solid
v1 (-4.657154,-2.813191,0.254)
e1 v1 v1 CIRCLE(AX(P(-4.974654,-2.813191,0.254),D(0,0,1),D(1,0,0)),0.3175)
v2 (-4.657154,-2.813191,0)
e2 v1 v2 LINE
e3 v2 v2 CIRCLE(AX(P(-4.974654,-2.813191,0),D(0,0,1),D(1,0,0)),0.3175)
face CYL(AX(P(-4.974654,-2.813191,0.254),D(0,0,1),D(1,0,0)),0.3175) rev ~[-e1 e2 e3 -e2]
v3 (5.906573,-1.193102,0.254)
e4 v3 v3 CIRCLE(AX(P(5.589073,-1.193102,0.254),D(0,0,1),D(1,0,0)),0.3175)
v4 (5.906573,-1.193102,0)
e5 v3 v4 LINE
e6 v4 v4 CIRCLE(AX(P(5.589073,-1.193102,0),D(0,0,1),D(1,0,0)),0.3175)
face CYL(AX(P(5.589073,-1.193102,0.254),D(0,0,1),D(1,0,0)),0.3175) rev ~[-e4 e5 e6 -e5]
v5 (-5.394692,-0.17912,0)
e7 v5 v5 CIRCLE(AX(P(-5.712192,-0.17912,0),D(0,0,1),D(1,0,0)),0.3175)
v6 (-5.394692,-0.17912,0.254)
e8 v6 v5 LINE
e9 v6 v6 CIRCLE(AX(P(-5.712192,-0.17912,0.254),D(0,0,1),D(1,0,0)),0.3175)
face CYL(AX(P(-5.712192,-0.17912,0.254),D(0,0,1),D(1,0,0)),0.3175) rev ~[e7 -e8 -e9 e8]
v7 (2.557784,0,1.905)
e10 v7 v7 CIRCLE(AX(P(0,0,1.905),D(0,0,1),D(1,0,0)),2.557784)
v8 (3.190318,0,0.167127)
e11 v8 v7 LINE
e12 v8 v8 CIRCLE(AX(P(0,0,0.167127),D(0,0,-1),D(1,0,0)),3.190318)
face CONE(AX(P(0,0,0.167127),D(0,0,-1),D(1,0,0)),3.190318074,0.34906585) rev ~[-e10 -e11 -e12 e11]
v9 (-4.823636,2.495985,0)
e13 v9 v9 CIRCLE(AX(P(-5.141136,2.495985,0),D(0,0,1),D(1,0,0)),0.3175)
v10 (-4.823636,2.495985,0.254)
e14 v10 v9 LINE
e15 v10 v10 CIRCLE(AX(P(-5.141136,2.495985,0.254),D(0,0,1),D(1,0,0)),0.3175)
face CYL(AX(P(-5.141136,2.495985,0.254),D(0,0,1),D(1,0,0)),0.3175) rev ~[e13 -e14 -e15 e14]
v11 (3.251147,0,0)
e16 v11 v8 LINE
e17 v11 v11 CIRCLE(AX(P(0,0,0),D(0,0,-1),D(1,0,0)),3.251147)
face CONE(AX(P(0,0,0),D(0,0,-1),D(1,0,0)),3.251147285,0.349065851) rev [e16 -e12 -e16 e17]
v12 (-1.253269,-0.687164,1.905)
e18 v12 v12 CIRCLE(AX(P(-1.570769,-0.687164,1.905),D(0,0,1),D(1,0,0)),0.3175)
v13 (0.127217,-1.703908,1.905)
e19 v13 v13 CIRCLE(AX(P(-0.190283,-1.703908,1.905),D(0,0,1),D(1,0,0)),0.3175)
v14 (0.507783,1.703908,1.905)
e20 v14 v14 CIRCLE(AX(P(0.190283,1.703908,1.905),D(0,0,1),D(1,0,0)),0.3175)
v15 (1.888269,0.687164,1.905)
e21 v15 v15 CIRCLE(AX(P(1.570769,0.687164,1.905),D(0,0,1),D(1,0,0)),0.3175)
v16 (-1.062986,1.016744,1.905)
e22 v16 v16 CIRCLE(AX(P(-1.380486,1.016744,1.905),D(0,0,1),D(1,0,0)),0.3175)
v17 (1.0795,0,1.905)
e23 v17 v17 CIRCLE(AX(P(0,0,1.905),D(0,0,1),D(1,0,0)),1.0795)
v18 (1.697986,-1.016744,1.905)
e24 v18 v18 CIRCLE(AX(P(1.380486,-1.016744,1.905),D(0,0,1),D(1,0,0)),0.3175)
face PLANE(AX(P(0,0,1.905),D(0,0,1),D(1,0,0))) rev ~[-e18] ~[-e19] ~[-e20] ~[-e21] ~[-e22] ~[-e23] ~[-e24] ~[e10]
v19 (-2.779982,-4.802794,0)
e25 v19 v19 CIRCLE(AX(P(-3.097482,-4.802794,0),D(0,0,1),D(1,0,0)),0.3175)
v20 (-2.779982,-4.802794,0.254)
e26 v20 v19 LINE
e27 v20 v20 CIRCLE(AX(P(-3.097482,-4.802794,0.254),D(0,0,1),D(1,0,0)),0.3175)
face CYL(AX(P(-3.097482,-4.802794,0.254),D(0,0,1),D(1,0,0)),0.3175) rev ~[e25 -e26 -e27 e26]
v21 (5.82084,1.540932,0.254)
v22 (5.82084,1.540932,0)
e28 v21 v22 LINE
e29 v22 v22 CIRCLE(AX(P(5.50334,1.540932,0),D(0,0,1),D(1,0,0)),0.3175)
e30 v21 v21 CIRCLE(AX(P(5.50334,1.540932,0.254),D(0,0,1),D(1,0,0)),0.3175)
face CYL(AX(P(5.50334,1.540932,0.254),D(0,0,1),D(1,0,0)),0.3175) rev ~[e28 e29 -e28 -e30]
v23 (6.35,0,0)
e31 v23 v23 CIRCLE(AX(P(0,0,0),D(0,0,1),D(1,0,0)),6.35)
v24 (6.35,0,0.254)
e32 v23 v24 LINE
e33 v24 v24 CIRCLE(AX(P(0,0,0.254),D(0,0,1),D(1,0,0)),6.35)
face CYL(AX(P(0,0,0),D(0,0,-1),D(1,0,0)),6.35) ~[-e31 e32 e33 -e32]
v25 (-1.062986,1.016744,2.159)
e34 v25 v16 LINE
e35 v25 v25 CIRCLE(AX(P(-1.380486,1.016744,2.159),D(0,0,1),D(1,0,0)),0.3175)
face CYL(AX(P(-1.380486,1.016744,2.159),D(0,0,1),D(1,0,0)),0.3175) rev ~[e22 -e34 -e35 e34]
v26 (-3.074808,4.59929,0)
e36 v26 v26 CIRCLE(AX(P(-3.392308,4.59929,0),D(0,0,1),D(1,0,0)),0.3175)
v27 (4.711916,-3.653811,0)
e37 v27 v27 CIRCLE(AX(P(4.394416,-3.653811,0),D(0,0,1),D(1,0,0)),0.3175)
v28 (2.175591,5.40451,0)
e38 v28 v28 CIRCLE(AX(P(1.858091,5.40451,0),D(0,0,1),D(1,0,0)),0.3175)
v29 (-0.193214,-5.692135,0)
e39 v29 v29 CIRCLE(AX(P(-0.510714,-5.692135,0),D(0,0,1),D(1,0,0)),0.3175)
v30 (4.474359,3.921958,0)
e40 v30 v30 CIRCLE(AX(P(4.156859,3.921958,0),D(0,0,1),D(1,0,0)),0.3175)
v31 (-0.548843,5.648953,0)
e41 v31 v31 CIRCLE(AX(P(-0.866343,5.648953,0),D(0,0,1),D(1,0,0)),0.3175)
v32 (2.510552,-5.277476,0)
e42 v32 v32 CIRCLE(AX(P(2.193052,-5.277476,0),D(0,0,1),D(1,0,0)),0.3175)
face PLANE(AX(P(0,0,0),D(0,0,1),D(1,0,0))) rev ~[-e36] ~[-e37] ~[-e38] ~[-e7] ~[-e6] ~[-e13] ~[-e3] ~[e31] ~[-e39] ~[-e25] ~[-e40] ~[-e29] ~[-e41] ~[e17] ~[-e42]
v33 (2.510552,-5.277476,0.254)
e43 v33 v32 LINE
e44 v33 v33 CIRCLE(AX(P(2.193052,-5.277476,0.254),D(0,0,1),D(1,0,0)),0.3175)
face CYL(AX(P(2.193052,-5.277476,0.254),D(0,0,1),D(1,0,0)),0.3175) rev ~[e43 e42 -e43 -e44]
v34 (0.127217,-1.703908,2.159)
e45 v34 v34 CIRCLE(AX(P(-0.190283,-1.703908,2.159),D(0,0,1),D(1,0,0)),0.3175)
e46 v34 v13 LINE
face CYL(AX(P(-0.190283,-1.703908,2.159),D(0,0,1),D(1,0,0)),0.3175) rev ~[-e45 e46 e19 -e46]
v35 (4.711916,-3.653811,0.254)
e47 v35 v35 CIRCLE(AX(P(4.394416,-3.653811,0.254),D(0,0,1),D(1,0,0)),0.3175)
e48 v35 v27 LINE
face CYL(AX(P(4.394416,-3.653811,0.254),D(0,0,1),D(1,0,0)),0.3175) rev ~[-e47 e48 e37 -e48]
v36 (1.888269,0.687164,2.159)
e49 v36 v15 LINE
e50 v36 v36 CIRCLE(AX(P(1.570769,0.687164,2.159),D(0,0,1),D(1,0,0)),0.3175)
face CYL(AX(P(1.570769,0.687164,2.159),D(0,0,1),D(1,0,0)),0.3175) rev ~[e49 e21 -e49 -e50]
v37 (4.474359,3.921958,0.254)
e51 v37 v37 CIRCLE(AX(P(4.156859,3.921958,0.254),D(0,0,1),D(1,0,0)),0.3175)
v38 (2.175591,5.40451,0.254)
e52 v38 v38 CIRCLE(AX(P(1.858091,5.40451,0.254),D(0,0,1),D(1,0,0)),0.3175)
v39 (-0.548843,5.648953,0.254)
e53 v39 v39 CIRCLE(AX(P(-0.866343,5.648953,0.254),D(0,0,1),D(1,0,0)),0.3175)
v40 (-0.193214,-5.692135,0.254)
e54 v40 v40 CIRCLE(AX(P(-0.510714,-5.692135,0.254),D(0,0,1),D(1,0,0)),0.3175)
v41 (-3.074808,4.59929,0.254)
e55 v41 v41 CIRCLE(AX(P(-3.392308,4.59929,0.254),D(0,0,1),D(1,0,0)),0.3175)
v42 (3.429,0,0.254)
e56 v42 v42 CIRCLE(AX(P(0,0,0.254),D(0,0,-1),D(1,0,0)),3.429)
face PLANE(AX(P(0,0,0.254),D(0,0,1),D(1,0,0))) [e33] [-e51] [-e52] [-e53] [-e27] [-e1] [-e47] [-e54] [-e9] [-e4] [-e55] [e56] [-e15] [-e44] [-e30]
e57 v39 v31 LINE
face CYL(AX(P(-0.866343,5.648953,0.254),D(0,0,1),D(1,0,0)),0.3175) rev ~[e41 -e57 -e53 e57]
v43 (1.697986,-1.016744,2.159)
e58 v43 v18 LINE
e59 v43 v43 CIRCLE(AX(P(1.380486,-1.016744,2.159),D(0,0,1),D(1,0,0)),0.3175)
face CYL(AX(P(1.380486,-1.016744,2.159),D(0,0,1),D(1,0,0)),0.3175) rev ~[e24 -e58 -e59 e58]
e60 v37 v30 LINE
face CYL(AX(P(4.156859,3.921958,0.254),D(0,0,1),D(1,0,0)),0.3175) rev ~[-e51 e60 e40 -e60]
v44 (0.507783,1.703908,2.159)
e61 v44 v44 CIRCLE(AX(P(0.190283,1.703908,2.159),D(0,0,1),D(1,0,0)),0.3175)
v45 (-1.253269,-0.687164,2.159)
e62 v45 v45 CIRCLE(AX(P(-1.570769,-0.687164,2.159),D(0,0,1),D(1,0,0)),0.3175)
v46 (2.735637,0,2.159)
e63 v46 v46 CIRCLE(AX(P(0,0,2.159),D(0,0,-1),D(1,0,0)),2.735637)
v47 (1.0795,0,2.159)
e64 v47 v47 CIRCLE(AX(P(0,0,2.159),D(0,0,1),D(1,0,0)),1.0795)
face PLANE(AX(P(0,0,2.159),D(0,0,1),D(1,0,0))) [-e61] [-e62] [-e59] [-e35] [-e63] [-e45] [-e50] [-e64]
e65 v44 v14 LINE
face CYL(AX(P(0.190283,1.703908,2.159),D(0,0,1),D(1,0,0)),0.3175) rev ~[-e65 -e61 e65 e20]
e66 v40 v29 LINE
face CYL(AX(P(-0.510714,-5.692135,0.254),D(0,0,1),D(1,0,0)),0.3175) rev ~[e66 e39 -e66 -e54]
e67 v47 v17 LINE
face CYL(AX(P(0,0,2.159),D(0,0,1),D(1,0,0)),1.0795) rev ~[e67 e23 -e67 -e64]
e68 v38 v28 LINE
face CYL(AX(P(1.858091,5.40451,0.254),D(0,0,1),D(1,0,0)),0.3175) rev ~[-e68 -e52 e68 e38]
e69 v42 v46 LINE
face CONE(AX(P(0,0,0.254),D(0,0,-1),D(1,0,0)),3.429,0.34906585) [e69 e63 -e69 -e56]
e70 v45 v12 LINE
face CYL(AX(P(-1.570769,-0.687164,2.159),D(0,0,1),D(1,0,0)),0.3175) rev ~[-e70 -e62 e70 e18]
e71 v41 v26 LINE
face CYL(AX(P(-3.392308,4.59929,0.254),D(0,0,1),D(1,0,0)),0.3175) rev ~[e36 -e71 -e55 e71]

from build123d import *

# Parameters (mm, degrees)
F0_R      = 6.35
F1_DEPTH  = 0.254
F2_R      = 3.429
F3_DEPTH  = 1.905
F3_TAPER  = 20
F4_T      = 0.254
F5_R      = 1.0795
F6_DEPTH  = 25.4
F7_R      = 0.3175
F8_DEPTH  = 25.4
F9_R      = 0.3175
F10_DEPTH = 25.4


# Not quite as in the source:
# - a shell that OpenCascade refuses in one call is made with other operations: the cavity is built on its own and cut out


with BuildPart() as f1:
    # F0 (on Top) → F1 (new body)
    with BuildSketch(Plane.XY):
        Circle(F0_R)
    extrude(amount=F1_DEPTH)

    # F2 (on face) → F3 (join)
    with BuildSketch(Plane.XY.offset(0.254)):
        Circle(F2_R)
    extrude(amount=F3_DEPTH, taper=F3_TAPER)

    # F4: shell of thickness 0.254, made by hand


with BuildPart() as f4_core1:
    # F4_t2: copy of F1
    add(f1.part)

    # the walls: a layer under each face that stays
    f4_faces = [f4_core1.faces().sort_by_distance(p)[0] for p in [
        (-6.35, 0, 0.127),
        (-4.2333333333, -4.2333333333, 0.254),
        (-3.0823183519, 0, 1.2065),
        (0, 0, 2.159),
    ]]
    thicken(f4_faces, amount=-F4_T, mode=Mode.SUBTRACT)

    # F4_s3 → F4_t4 (revolve, cut)
    with BuildSketch(Plane.XZ):
        Polygon((3.4313868193, 0.2574087312), (3.429, 0), (3.2511472853, 0), (3.1903180743, 0.1671268836), align=None)
    revolve(axis=Axis((0, 0, 0.254), (0, 0, -1)), mode=Mode.SUBTRACT)


with BuildPart() as f1_1:
    add(f1.part)

    # what is left inside the walls is the cavity
    f4_cavity = [f4_core1.part.solids().sort_by_distance(p)[0] for p in [
        (-2.977087, 0, 0.745549),
    ]]
    add(f4_cavity, mode=Mode.SUBTRACT)

    # F5 (on face) → F6 (cut)
    with BuildSketch(Plane.XY.offset(2.159)):
        Circle(F5_R)
    extrude(amount=-F6_DEPTH, mode=Mode.SUBTRACT)

    # F7 (on face) → F8 (cut)
    with BuildSketch(Plane.XY.offset(2.159)):
        with Locations((-1.3804862777, 1.0167437666)):
            Circle(F7_R)
        with Locations((-1.5707690699, -0.6871643028)):
            Circle(F7_R)
        with Locations((-0.1902827922, -1.7039080694)):
            Circle(F7_R)
        with Locations((1.3804862777, -1.0167437666)):
            Circle(F7_R)
        with Locations((1.5707690699, 0.6871643028)):
            Circle(F7_R)
        with Locations((0.1902827922, 1.7039080694)):
            Circle(F7_R)
    extrude(amount=-F8_DEPTH, mode=Mode.SUBTRACT)

    # F9 (on face) → F10 (cut)
    with BuildSketch(Plane.XY.offset(0.254)):
        with Locations((-3.3923081987, 4.5992901719)):
            Circle(F9_R)
        with Locations((-5.1411364532, 2.4959849698)):
            Circle(F9_R)
        with Locations((-5.7121923037, -0.179120309)):
            Circle(F9_R)
        with Locations((-4.9746537368, -2.8131912837)):
            Circle(F9_R)
        with Locations((-3.0974819499, -4.8027940378)):
            Circle(F9_R)
        with Locations((-0.510714377, -5.6921345579)):
            Circle(F9_R)
        with Locations((2.193051705, -5.2774756484)):
            Circle(F9_R)
        with Locations((4.3944160704, -3.6538106683)):
            Circle(F9_R)
        with Locations((5.5890726726, -1.1931016973)):
            Circle(F9_R)
        with Locations((5.5033400811, 1.5409324941)):
            Circle(F9_R)
        with Locations((4.1568585995, 3.9219576214)):
            Circle(F9_R)
        with Locations((1.8580909083, 5.4045095223)):
            Circle(F9_R)
        with Locations((-0.8663430176, 5.6489534231)):
            Circle(F9_R)
    extrude(amount=-F10_DEPTH, mode=Mode.SUBTRACT)


solid = f1_1.part
